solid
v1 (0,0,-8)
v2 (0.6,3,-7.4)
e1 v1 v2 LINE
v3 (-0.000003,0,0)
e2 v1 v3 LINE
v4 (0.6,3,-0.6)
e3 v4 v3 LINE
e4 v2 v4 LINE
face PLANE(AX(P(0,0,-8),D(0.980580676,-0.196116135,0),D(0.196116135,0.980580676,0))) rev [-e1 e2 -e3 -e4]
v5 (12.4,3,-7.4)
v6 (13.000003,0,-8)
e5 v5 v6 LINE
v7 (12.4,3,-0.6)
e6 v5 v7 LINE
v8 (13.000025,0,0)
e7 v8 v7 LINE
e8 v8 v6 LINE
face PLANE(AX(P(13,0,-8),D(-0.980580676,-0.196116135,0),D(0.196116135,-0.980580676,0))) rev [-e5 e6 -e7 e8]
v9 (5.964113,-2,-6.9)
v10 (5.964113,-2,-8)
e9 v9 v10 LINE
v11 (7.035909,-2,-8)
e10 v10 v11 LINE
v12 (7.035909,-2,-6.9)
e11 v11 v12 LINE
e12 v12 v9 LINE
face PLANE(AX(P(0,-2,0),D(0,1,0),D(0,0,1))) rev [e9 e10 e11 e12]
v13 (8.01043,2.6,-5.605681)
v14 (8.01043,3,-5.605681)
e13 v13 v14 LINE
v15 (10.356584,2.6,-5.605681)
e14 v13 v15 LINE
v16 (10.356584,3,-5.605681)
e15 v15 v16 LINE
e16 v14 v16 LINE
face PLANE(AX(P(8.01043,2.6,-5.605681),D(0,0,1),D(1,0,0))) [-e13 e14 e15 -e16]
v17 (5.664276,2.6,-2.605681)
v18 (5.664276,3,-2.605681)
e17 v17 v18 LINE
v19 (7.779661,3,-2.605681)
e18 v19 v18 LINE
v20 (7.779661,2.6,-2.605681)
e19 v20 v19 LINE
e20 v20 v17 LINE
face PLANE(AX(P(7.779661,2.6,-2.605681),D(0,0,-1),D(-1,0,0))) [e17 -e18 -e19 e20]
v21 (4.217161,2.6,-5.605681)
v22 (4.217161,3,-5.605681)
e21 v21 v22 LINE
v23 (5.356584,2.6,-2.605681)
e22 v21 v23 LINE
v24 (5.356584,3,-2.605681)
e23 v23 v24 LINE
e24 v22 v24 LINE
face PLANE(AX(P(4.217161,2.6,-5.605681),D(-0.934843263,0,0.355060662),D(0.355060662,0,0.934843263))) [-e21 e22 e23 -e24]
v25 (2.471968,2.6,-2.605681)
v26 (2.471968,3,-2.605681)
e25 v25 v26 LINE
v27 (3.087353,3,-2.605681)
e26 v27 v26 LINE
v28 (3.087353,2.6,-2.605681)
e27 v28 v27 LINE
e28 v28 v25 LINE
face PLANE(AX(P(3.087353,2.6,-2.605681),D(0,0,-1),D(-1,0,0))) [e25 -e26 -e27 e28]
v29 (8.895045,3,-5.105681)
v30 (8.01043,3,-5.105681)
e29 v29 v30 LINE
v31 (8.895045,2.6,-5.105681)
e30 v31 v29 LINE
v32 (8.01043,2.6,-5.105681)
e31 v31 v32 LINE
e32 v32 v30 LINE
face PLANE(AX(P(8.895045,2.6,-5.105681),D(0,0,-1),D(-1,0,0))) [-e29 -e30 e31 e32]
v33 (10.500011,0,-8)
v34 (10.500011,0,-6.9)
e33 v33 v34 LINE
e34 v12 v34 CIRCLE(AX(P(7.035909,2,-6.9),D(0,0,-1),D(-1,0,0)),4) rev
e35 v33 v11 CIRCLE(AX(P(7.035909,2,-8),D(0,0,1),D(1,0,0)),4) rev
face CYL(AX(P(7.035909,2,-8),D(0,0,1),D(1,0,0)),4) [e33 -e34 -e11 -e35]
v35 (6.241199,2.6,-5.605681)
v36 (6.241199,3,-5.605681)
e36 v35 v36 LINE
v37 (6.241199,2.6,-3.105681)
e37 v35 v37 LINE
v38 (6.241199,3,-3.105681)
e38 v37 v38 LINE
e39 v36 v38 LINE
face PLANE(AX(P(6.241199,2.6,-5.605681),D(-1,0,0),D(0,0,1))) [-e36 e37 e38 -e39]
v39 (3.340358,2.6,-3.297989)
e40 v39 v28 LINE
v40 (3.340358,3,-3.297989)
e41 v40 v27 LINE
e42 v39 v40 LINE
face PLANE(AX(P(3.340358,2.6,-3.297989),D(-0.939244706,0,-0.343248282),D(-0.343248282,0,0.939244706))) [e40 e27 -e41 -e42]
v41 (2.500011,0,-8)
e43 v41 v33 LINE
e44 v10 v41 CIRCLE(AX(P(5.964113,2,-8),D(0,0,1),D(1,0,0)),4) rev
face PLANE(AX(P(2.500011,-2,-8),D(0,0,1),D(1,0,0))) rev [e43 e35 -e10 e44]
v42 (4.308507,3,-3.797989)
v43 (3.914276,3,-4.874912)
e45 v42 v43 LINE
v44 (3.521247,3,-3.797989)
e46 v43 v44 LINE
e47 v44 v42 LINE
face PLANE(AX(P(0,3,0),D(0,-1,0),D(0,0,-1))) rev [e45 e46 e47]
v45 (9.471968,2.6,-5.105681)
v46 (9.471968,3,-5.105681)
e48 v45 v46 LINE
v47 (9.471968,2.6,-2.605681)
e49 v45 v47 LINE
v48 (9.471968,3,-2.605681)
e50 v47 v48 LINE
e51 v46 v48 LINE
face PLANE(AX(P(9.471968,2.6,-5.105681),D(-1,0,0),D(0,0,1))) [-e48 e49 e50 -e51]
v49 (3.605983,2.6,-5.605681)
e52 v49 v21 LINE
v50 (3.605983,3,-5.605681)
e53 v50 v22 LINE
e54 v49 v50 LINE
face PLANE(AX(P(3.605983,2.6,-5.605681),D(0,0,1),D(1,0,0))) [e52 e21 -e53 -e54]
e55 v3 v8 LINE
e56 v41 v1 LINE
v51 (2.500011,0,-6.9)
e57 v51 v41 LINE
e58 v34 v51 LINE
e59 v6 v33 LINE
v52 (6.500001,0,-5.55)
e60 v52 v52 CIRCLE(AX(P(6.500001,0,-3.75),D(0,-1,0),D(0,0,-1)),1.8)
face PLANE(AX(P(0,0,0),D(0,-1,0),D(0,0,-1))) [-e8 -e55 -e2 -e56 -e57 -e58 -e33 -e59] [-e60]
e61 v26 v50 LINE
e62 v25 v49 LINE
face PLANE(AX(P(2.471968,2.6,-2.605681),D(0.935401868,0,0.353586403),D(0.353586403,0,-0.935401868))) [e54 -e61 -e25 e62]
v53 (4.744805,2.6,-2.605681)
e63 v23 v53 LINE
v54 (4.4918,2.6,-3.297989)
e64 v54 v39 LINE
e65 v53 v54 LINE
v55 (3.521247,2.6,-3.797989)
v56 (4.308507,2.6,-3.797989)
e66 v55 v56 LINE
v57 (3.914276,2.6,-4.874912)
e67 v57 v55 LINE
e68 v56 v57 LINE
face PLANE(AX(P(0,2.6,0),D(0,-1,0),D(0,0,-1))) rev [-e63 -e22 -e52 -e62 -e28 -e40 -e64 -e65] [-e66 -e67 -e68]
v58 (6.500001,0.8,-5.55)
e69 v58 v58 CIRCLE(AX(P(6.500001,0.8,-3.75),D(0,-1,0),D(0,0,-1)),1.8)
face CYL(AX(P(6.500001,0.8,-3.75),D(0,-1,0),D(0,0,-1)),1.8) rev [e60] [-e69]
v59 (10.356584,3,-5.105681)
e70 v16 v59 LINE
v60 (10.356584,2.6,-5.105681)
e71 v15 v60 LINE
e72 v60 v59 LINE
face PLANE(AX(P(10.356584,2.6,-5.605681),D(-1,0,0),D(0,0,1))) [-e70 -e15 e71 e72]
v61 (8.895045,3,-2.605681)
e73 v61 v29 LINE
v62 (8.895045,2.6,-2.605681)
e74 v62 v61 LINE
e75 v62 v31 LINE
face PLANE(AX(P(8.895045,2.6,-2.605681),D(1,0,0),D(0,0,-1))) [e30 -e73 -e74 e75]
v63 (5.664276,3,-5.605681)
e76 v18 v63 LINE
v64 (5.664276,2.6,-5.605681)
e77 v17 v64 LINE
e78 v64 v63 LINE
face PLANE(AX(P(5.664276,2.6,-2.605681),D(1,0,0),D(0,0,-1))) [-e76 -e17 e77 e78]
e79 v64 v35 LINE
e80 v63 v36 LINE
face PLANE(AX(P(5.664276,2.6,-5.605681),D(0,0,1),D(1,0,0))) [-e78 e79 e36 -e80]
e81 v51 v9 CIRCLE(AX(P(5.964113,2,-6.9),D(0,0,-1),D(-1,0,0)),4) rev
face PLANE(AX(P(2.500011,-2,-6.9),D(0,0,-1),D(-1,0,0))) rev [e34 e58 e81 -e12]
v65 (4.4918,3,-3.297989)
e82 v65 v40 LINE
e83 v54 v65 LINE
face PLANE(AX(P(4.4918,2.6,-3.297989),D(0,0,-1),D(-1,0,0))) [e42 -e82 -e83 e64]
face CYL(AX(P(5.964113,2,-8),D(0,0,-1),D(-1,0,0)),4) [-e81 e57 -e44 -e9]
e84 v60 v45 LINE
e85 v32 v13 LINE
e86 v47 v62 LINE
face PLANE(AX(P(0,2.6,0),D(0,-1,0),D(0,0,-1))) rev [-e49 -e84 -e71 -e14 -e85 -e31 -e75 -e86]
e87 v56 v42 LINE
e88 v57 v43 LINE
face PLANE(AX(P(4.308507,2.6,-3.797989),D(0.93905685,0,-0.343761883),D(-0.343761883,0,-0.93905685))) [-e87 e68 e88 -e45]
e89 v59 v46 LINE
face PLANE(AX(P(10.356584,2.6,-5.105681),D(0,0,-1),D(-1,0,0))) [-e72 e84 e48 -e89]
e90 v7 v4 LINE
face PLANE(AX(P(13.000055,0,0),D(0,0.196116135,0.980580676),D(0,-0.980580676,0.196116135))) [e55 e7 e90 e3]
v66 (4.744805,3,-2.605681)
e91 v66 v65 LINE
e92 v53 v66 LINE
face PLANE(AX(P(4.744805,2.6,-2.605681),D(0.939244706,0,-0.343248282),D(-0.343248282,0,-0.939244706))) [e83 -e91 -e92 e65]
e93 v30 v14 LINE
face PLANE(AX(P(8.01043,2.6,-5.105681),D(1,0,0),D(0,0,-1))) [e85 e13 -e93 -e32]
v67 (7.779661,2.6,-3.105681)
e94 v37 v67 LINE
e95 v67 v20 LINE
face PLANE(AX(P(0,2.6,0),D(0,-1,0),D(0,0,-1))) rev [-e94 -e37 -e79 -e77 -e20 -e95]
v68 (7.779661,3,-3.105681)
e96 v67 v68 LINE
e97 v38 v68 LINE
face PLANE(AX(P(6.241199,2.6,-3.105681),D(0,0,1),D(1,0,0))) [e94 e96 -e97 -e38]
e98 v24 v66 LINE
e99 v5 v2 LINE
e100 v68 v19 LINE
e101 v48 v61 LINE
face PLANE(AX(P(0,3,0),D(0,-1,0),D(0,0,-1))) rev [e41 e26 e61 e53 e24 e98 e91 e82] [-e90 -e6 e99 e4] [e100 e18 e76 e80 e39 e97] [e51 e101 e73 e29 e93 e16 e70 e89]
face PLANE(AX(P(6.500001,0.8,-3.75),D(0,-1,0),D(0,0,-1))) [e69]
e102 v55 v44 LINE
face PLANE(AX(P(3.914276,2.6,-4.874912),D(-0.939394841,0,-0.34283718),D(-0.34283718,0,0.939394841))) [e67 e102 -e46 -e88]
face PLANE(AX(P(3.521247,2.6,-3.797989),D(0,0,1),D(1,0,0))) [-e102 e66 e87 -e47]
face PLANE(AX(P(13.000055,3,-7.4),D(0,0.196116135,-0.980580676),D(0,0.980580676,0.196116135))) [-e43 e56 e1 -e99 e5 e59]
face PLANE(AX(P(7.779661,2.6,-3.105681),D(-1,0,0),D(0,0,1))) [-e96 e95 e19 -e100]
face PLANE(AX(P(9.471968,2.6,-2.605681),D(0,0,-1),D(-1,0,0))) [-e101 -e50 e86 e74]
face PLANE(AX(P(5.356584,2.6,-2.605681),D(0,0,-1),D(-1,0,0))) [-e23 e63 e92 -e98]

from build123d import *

# Parameters (mm, degrees)
SKETCH1_W               = 13
SKETCH1_H               = 8
BOSS_EXTRUDE1_DEPTH     = 3
CUT_EXTRUDE1_DEPTH      = 16.556349186
CUT_EXTRUDE1_DEPTH_BACK = 16.556349186
CUT_EXTRUDE2_DEPTH      = 16.556349186
CUT_EXTRUDE2_DEPTH_BACK = 16.556349186
SKETCH4_R               = 1.8
CUT_EXTRUDE3_DEPTH      = 0.8
SKETCH5_W               = 8
SKETCH5_H               = 1.1
BOSS_EXTRUDE2_DEPTH     = 2
FILLET1_R               = 4
CUT_EXTRUDE4_DEPTH      = 0.4


with BuildPart() as part:
    # Sketch1 → Boss-Extrude1 (new body)
    with BuildSketch(Plane(origin=(0, 0, 0), x_dir=(1, 0, 0), z_dir=(0, 1, 0))):
        with Locations((6.5, 4)):
            Rectangle(SKETCH1_W, SKETCH1_H)
    extrude(amount=BOSS_EXTRUDE1_DEPTH)

    # Sketch2 → Cut-Extrude1 (cut, two sides: drawn at the far end of the back side and taken through both)
    with BuildSketch(Plane.XY.offset(-CUT_EXTRUDE1_DEPTH_BACK)):
        Polygon((0, 0), (0.6, 3), (0, 3), align=None)
        Polygon((13, 0), (12.4, 3), (13, 3), align=None)
    extrude(amount=CUT_EXTRUDE1_DEPTH + CUT_EXTRUDE1_DEPTH_BACK, mode=Mode.SUBTRACT)

    # Sketch3 → Cut-Extrude2 (cut, two sides: drawn at the far end of the back side and taken through both)
    with BuildSketch(Plane(origin=(0, 0, 0), x_dir=(0, 0, -1), z_dir=(1, 0, 0)).offset(-CUT_EXTRUDE2_DEPTH_BACK)):
        Polygon((0, 0), (0.6, 3), (0, 3), align=None)
        Polygon((8, 3), (7.4, 3), (8, 0), align=None)
    extrude(amount=CUT_EXTRUDE2_DEPTH + CUT_EXTRUDE2_DEPTH_BACK, mode=Mode.SUBTRACT)

    # Sketch4 → Cut-Extrude3 (cut)
    with BuildSketch(Plane.XZ):
        with Locations(Location((6.50000125, -3.75, 0), (0, 0, 270))):
            Circle(SKETCH4_R)
    extrude(amount=-CUT_EXTRUDE3_DEPTH, mode=Mode.SUBTRACT)

    # Sketch5 → Boss-Extrude2 (add)
    with BuildSketch(Plane.XZ):
        with Locations((6.500011, -7.45)):
            Rectangle(SKETCH5_W, SKETCH5_H)
    extrude(amount=BOSS_EXTRUDE2_DEPTH)

    # Fillet1
    # the kernel refuses this fillet: 4 mm, written as the material it takes off along each edge
    with BuildSketch(Plane(origin=(10.500011, -2, -16.660254038), x_dir=(0, 1, 0), z_dir=(0, 0, 1)), Plane(origin=(2.500011, -2, 1.760254038), x_dir=(0, 1, 0), z_dir=(0, 0, -1))) as fillet1_piece_1:
        with BuildLine():
            CenterArc((4, 3.464101615), FILLET1_R, 180, 60)
            Line((0, 3.464101615), (-0.08, 3.464101615))
            Line((-0.08, 3.464101615), (-0.08, 0))
            Line((-0.08, 0), (0, -0.08))
            ThreePointArc((0, -0.08), (1, -0.08), (1.96, -0.069282032))
            Line((1.96, -0.069282032), (2, 0))
        make_face()
    extrude(amount=18.420508076, mode=Mode.SUBTRACT)

    # Sketch6 → Cut-Extrude4 (cut)
    # profile 1 of 3: a face of its own
    with BuildSketch(Plane(origin=(0, 3, 0), x_dir=(1, 0, 0), z_dir=(0, 1, 0))):
        Polygon((5.356583629, 2.605681315), (4.744804782, 2.605681315), (4.491799975, 3.297989008), (3.340357667, 3.297989008), (3.087352859, 2.605681315), (2.471968244, 2.605681315), (3.605982667, 5.605681315), (4.217160552, 5.605681315), align=None)
        Polygon((4.308506705, 3.797989008), (3.914275936, 4.874912084), (3.52124709, 3.797989008), align=None, mode=Mode.SUBTRACT)
    # profile 2 of 3: a face of its own
    with BuildSketch(Plane(origin=(0, 3, 0), x_dir=(1, 0, 0), z_dir=(0, 1, 0))):
        Polygon((5.664275936, 2.605681315), (5.664275936, 5.605681315), (6.241199013, 5.605681315), (6.241199013, 3.105681315), (7.779660552, 3.105681315), (7.779660552, 2.605681315), align=None)
    # profile 3 of 3: a face of its own
    with BuildSketch(Plane(origin=(0, 3, 0), x_dir=(1, 0, 0), z_dir=(0, 1, 0))):
        Polygon((8.895045167, 2.605681315), (8.895045167, 5.105681315), (8.010429782, 5.105681315), (8.010429782, 5.605681315), (10.356583629, 5.605681315), (10.356583629, 5.105681315), (9.471968244, 5.105681315), (9.471968244, 2.605681315), align=None)
    extrude(amount=-CUT_EXTRUDE4_DEPTH, mode=Mode.SUBTRACT)


solid = part.part
